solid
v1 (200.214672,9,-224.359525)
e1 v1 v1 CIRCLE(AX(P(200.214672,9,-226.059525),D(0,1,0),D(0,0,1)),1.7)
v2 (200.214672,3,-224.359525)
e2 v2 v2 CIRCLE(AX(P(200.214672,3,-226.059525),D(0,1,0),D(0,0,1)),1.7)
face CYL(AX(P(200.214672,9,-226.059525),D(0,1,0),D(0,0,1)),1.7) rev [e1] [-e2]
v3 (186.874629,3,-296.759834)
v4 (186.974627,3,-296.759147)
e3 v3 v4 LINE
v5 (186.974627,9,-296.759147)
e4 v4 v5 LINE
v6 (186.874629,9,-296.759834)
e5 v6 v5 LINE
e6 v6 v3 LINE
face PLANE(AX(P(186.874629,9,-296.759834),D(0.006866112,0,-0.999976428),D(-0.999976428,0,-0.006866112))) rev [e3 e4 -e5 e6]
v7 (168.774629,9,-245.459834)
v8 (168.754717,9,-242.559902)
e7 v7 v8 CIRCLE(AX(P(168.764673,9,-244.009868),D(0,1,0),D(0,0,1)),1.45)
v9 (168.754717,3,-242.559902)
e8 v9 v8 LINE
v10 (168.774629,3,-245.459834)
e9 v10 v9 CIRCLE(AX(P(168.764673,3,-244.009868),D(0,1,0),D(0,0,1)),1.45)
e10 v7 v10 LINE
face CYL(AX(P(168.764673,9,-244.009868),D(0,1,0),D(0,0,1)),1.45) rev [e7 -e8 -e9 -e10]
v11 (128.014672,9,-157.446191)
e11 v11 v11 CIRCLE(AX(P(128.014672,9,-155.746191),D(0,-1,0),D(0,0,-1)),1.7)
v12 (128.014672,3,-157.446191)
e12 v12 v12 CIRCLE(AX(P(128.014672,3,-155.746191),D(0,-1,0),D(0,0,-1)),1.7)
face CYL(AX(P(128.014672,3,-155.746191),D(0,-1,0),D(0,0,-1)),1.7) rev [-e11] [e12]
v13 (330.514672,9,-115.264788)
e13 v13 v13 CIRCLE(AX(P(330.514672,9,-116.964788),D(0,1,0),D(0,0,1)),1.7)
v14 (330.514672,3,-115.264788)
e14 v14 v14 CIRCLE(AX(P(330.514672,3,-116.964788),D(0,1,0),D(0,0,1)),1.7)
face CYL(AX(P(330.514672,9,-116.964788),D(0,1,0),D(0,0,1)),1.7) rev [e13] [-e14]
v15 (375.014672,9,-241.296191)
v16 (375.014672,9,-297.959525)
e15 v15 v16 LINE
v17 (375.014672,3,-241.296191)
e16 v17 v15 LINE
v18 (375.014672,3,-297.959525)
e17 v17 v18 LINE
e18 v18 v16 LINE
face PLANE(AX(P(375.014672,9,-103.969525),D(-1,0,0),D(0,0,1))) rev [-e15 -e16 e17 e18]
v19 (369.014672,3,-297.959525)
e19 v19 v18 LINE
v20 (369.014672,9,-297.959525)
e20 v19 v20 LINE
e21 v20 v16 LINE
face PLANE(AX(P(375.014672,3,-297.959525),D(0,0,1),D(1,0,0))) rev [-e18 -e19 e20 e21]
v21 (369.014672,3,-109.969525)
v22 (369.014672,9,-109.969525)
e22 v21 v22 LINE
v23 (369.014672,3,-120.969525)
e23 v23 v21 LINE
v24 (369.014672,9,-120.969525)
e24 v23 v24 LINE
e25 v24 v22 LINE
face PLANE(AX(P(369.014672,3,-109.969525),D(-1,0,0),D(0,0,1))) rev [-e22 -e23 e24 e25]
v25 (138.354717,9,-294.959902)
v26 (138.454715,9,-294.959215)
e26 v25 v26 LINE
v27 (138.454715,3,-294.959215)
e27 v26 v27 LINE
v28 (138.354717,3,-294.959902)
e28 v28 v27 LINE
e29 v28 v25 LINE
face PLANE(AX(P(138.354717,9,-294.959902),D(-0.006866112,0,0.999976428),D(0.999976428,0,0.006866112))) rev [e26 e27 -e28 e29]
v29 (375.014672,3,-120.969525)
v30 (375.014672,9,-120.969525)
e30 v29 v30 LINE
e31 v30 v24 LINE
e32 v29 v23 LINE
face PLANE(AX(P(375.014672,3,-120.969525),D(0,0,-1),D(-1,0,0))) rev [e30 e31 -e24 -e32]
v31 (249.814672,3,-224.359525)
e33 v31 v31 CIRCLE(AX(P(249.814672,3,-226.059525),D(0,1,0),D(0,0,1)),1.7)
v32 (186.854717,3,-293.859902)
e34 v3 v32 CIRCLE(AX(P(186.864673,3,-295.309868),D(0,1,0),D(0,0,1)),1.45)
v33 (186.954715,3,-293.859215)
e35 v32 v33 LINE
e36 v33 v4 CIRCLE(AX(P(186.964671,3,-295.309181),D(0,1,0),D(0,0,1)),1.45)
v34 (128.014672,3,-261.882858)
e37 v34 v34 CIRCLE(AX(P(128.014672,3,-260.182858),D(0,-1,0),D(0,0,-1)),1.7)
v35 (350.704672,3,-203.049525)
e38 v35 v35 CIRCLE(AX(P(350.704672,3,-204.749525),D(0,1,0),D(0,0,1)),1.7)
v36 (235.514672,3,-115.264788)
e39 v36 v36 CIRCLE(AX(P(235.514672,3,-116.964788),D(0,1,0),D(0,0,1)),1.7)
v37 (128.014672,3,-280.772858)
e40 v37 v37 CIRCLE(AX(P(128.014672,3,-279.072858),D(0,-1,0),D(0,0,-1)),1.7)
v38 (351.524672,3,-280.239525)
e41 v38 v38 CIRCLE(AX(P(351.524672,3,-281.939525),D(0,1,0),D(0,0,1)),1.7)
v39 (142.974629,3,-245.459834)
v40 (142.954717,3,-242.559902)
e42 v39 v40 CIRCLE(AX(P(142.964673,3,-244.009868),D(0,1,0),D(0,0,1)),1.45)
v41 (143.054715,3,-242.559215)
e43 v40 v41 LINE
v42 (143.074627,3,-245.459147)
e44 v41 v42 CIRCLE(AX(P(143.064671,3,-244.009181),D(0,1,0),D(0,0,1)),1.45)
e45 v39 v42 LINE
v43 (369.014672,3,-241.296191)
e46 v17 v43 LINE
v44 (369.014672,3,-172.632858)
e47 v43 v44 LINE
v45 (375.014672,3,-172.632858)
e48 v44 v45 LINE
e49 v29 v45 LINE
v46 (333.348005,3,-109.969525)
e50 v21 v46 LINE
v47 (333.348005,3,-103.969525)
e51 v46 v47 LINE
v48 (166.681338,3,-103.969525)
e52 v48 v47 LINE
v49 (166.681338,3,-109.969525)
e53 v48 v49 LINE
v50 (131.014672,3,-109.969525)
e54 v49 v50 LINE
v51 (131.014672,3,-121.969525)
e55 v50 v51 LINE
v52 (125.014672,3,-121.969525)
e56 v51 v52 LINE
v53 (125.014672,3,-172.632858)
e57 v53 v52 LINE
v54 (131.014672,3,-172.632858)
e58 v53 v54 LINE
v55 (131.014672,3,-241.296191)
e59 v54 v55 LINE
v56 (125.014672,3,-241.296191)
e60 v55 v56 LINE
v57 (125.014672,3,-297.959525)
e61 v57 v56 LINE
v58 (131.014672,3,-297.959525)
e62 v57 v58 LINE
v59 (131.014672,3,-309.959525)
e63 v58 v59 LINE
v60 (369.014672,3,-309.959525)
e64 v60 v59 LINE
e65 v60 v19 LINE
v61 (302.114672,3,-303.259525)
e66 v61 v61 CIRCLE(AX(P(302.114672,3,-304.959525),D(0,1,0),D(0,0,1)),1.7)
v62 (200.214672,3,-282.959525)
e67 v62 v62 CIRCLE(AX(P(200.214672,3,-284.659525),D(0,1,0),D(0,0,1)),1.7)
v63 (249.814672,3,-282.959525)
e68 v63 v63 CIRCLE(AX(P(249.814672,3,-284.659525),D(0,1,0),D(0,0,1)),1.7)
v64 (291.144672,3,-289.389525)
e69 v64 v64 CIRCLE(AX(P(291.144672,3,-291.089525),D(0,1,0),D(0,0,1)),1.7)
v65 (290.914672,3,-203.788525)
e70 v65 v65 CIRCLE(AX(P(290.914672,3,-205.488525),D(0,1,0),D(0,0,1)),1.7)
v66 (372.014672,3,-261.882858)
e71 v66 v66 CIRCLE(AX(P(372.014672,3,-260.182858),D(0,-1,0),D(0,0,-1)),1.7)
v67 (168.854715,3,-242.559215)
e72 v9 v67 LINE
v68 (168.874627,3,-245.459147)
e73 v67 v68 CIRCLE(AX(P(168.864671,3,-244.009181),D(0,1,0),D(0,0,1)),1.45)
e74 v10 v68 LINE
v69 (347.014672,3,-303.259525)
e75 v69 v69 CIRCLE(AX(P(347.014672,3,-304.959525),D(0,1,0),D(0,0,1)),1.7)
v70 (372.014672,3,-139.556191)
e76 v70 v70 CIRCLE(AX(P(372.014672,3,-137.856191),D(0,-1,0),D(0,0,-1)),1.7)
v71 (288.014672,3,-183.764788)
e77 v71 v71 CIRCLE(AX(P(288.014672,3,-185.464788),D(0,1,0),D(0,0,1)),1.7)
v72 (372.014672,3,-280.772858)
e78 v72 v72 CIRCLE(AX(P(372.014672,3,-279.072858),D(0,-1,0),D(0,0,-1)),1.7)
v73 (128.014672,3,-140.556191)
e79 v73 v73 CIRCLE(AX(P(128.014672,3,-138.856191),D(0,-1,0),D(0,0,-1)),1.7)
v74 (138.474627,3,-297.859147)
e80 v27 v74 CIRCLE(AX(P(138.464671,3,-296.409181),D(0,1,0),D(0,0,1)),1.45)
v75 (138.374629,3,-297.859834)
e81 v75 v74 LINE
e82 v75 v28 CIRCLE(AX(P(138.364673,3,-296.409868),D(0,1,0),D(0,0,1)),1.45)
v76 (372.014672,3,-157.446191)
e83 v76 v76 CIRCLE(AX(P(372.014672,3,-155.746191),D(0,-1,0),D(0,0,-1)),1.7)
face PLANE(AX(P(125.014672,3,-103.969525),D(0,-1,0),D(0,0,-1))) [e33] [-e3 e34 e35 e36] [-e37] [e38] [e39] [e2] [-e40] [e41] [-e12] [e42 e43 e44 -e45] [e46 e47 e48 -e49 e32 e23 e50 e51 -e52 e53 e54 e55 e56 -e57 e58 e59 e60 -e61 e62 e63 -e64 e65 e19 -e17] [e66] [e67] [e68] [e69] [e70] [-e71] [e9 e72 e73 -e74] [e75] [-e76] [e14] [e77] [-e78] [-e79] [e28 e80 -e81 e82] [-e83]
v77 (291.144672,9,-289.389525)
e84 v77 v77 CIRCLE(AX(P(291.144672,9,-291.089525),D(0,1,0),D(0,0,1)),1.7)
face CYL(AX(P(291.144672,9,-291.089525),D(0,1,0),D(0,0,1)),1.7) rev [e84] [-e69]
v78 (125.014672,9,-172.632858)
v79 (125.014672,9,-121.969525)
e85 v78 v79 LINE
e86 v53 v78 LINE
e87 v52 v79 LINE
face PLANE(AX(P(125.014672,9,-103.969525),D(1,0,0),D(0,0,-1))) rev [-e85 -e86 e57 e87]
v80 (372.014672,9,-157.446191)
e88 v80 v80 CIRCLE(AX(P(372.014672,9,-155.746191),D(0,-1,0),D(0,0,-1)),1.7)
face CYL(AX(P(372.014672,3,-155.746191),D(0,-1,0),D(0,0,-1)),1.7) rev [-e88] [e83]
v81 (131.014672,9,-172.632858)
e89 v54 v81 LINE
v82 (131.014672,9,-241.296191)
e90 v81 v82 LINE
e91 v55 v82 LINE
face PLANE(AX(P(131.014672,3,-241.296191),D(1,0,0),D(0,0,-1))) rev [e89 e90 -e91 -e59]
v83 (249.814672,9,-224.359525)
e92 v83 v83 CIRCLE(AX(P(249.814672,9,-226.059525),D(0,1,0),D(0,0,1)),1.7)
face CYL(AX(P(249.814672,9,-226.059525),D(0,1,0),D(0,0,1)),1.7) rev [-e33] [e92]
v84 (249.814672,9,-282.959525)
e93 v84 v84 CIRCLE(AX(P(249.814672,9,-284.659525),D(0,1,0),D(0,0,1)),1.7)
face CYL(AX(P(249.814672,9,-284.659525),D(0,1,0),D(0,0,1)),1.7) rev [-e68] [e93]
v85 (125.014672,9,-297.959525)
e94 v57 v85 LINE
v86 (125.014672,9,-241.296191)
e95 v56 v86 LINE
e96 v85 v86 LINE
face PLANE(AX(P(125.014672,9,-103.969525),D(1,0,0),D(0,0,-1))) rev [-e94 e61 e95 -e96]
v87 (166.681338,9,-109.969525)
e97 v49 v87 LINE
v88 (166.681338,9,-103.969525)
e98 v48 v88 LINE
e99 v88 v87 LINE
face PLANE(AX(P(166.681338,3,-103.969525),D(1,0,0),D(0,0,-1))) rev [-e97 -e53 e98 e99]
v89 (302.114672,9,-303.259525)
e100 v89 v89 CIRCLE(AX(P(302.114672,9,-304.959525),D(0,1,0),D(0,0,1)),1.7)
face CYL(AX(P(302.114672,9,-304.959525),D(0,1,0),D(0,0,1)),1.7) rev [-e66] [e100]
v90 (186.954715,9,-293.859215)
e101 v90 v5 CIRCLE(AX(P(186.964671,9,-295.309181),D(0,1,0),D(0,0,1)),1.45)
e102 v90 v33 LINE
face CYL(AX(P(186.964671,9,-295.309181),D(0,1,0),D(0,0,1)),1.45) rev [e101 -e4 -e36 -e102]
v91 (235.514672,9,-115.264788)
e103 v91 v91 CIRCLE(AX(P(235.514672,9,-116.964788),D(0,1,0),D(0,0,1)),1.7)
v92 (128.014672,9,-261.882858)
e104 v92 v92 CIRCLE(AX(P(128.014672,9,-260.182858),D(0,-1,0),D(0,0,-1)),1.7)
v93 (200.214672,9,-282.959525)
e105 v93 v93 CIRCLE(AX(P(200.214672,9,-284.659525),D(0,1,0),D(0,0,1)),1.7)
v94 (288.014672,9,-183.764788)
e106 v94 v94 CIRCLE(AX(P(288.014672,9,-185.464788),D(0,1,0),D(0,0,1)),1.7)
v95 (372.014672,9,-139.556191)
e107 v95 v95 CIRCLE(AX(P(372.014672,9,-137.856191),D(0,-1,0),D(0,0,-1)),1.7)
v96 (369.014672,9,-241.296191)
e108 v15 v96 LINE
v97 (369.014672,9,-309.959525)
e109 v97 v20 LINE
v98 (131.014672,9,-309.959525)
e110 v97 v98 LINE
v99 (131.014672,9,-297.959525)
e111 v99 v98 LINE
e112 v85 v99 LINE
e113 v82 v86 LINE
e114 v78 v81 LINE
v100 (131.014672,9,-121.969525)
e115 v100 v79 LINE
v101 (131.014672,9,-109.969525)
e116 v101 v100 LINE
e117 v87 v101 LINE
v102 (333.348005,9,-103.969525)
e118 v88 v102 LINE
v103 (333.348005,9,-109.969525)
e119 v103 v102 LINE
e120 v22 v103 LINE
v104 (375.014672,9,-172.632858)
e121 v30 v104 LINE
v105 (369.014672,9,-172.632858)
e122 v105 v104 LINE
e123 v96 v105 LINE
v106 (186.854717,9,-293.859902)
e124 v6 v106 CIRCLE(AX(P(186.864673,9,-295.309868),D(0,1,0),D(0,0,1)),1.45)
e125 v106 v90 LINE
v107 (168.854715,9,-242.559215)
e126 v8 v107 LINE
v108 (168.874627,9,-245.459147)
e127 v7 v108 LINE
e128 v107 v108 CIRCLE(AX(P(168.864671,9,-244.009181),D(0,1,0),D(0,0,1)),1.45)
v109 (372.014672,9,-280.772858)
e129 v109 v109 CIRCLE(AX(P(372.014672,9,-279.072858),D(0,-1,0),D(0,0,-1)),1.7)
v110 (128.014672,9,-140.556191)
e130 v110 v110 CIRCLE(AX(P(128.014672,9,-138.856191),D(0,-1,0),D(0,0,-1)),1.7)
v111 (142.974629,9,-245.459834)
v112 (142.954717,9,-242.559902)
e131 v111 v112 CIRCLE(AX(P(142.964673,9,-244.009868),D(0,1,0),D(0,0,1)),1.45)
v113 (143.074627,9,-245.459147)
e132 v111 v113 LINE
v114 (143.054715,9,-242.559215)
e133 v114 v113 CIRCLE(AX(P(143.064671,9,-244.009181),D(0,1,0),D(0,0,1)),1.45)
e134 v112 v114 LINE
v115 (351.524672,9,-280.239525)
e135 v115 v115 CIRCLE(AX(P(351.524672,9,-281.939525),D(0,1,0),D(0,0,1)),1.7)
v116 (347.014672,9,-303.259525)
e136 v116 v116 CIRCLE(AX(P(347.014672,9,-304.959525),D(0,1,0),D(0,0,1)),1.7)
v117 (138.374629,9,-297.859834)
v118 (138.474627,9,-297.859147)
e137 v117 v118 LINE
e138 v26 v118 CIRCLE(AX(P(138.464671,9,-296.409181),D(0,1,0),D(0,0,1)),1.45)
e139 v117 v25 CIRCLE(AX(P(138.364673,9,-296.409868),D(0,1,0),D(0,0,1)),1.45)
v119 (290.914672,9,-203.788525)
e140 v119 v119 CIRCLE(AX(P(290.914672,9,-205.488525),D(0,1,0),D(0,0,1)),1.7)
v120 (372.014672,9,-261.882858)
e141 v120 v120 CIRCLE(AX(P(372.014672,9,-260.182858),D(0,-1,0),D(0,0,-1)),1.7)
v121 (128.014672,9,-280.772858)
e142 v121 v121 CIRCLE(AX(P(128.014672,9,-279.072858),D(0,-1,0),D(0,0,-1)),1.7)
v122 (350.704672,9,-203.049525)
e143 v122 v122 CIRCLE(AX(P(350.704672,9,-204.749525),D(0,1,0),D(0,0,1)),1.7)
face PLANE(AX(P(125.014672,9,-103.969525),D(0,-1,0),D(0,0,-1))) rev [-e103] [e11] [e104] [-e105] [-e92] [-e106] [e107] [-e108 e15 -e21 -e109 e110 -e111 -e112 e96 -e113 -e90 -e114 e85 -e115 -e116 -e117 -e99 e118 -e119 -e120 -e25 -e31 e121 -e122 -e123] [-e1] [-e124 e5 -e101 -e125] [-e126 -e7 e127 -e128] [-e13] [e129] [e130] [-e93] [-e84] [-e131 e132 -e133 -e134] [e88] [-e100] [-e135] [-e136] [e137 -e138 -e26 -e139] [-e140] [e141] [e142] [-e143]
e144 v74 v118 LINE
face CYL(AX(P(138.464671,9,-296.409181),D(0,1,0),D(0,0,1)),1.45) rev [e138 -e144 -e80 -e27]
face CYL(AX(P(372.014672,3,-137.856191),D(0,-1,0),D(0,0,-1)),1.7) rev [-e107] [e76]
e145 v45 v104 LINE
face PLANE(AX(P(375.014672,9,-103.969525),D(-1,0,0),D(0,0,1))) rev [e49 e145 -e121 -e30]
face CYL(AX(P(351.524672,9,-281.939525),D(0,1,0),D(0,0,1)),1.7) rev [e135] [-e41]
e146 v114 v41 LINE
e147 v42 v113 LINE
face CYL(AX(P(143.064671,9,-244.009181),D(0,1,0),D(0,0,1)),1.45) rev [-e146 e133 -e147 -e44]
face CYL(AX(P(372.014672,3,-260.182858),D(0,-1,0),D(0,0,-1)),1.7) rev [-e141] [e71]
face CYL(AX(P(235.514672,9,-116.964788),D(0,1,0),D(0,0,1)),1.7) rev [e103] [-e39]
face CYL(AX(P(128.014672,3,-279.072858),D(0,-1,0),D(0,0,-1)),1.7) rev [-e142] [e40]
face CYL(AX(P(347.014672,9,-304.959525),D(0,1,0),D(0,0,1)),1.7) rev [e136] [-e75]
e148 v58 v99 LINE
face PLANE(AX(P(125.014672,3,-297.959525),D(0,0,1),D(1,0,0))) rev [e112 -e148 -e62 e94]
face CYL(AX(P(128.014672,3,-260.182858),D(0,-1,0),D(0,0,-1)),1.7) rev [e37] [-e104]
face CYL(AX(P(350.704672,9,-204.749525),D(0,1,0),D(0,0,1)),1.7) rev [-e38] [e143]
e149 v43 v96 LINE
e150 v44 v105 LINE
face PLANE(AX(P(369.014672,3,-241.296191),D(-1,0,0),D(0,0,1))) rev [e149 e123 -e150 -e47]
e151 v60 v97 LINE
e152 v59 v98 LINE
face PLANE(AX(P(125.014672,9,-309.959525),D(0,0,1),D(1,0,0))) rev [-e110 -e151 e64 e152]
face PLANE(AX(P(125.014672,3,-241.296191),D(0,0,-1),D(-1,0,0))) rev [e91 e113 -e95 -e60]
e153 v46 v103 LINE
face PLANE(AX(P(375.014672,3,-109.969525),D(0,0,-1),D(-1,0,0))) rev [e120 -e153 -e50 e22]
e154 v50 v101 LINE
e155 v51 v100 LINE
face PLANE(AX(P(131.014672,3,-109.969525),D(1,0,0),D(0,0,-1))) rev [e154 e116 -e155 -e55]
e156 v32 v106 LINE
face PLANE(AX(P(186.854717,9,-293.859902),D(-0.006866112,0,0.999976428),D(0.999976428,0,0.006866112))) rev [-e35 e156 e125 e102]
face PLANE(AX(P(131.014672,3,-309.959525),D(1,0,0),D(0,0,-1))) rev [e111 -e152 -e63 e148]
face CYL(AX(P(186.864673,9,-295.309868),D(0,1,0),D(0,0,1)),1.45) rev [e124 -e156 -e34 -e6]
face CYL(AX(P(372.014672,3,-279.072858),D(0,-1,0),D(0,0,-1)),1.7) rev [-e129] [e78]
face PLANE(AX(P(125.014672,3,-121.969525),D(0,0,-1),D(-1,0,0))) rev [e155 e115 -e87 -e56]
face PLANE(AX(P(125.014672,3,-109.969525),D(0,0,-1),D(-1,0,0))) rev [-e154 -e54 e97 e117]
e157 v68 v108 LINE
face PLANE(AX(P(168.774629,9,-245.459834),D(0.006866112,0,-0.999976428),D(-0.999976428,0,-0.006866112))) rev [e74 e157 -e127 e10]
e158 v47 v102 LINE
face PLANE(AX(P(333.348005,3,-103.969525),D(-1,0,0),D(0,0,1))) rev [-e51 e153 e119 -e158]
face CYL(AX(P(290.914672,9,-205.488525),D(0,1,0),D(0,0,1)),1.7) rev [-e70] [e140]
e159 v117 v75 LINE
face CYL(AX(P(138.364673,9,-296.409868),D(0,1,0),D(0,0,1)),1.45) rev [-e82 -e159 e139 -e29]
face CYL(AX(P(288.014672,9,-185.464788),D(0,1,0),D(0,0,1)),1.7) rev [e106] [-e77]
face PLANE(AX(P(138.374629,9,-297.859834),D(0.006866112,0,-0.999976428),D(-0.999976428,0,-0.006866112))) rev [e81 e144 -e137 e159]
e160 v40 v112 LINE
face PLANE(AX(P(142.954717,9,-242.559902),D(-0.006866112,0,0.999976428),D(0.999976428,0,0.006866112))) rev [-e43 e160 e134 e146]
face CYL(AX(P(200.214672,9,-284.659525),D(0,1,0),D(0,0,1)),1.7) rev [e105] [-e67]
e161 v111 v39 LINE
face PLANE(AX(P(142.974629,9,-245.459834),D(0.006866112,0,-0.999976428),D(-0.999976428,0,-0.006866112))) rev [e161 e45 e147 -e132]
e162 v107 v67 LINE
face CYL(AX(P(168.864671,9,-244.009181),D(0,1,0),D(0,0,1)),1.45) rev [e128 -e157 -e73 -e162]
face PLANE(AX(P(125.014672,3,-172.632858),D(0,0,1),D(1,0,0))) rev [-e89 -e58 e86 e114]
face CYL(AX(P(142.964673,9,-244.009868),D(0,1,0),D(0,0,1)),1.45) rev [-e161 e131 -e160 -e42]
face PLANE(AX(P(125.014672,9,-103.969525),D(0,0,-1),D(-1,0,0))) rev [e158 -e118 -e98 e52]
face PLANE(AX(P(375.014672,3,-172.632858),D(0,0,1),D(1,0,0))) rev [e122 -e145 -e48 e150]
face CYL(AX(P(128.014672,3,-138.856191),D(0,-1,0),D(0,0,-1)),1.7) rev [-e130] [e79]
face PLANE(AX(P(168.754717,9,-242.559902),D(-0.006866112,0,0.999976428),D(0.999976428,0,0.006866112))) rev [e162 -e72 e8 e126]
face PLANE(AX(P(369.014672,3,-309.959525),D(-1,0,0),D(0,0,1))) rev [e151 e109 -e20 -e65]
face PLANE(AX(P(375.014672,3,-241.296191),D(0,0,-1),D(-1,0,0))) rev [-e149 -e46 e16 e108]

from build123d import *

# Parameters (mm, degrees)
SKETCH1_W                  = 500
SKETCH1_H                  = 411.98
BOSS_EXTRUDE1_DEPTH        = 12
SKETCH2_W                  = 83.333333333
SKETCH2_H                  = 12
SKETCH2_W_2                = 12
SKETCH2_H_2                = 137.326666666
CUT_EXTRUDE1_DEPTH         = 12
SKETCH4_W                  = 12
SKETCH4_H                  = 24
SKETCH4_H_2                = 22
CUT_EXTRUDE2_DEPTH         = 12
SCALE1_SCALE               = 0.5
M2_5_START                 = 3
M2_5_CLEARANCE_SLOT1_DEPTH = 6
M3_CLEARANCE_SLOT1_D       = 3.4
M3_CLEARANCE_SLOT2_D       = 3.4


# Read off the part's stored shape, not the designer's step: M2.5 Clearance Slot1
with BuildPart() as part:
    # Sketch1 → Boss-Extrude1 (new body)
    with BuildSketch(Plane(origin=(0, 0, 0), x_dir=(1, 0, 0), z_dir=(0, 1, 0))):
        with Locations((250, 205.99)):
            Rectangle(SKETCH1_W, SKETCH1_H)
    extrude(amount=BOSS_EXTRUDE1_DEPTH)

    # Sketch2 → Cut-Extrude1 (cut)
    with BuildSketch(Plane(origin=(0, 12, 0), x_dir=(1, 0, 0), z_dir=(0, 1, 0))):
        with Locations((41.666666666, 6)):
            Rectangle(SKETCH2_W, SKETCH2_H)
        with Locations((458.333333334, 6)):
            Rectangle(SKETCH2_W, SKETCH2_H)
        with Locations((6, 205.99)):
            Rectangle(SKETCH2_W_2, SKETCH2_H_2)
        with Locations((494, 205.99)):
            Rectangle(SKETCH2_W_2, SKETCH2_H_2)
    extrude(amount=-CUT_EXTRUDE1_DEPTH, mode=Mode.SUBTRACT)

    # Sketch4 → Cut-Extrude2 (cut)
    with BuildSketch(Plane(origin=(0, 12, 0), x_dir=(1, 0, 0), z_dir=(0, 1, 0))):
        with Locations((6, 399.98)):
            Rectangle(SKETCH4_W, SKETCH4_H)
        with Locations((494, 399.98)):
            Rectangle(SKETCH4_W, SKETCH4_H)
        with Locations((494, 23)):
            Rectangle(SKETCH4_W, SKETCH4_H_2)
        with Locations((6, 24)):
            Rectangle(SKETCH4_W, SKETCH4_H)
    extrude(amount=-CUT_EXTRUDE2_DEPTH, mode=Mode.SUBTRACT)


with BuildPart() as part_1:
    # Scale1: scaled about (250.029343652, 6, -207.939049077)
    add(part.part.scale(SCALE1_SCALE).moved(Location((125.014671826, 3, -103.969524538))))

    # M2.5 Clearance Slot1 outline → M2.5 Clearance Slot1 (cut)
    with BuildSketch(Plane(origin=(0, 0, 0), x_dir=(1, 0, 0), z_dir=(0, 1, 0)).offset(M2_5_START)):
        with BuildLine():
            Line((138.354717143, 294.959902024), (138.454714786, 294.959215412))
            ThreePointArc((138.454714786, 294.959215412), (139.914636468, 296.399225372), (138.474626509, 297.859147054))
            Line((138.474626509, 297.859147054), (138.374628867, 297.859833665))
            ThreePointArc((138.374628867, 297.859833665), (136.914707184, 296.419823707), (138.354717143, 294.959902024))
        make_face()
        with BuildLine():
            Line((186.854717143, 293.859902024), (186.954714786, 293.859215412))
            ThreePointArc((186.954714786, 293.859215412), (188.414636468, 295.299225372), (186.974626509, 296.759147054))
            Line((186.974626509, 296.759147054), (186.874628867, 296.759833665))
            ThreePointArc((186.874628867, 296.759833665), (185.414707184, 295.319823707), (186.854717143, 293.859902024))
        make_face()
        with BuildLine():
            Line((168.754717143, 242.559902024), (168.854714786, 242.559215412))
            ThreePointArc((168.854714786, 242.559215412), (170.314636468, 243.999225372), (168.874626509, 245.459147054))
            Line((168.874626509, 245.459147054), (168.774628867, 245.459833665))
            ThreePointArc((168.774628867, 245.459833665), (167.314707184, 244.019823707), (168.754717143, 242.559902024))
        make_face()
        with BuildLine():
            Line((142.954717143, 242.559902024), (143.054714786, 242.559215412))
            ThreePointArc((143.054714786, 242.559215412), (144.514636468, 243.999225372), (143.074626509, 245.459147054))
            Line((143.074626509, 245.459147054), (142.974628867, 245.459833665))
            ThreePointArc((142.974628867, 245.459833665), (141.514707184, 244.019823707), (142.954717143, 242.559902024))
        make_face()
    extrude(amount=M2_5_CLEARANCE_SLOT1_DEPTH, mode=Mode.SUBTRACT)

    # M3 Clearance Slot1 (through all)
    with Locations(Plane(origin=(0, 9, 0), x_dir=(1, 0, 0), z_dir=(0, 1, 0))):
        with Locations((200.214671826, 226.059524539), (200.214671826, 284.659524539), (249.814671826, 284.659524539), (249.814671826, 226.059524539), (235.514671826, 116.964788111), (288.014671826, 185.464788111), (330.514671826, 116.964788111), (290.914671826, 205.488524539), (291.144671826, 291.089524539), (351.524671826, 281.939524539), (350.704671826, 204.749524539), (302.114671826, 304.959524539), (347.014671826, 304.959524539)):
            Hole(M3_CLEARANCE_SLOT1_D / 2)

    # M3 Clearance Slot2 (through all)
    with Locations(Plane(origin=(0, 3, 0), x_dir=(-1, 0, 0), z_dir=(0, -1, 0))):
        with Locations((-372.014671826, 137.856191205), (-372.014671826, 155.746191205), (-372.014671826, 260.182857872), (-372.014671826, 279.072857872), (-128.014671826, 138.856191205), (-128.014671826, 155.746191205), (-128.014671826, 260.182857872), (-128.014671826, 279.072857872)):
            Hole(M3_CLEARANCE_SLOT2_D / 2)


solid = part_1.part
